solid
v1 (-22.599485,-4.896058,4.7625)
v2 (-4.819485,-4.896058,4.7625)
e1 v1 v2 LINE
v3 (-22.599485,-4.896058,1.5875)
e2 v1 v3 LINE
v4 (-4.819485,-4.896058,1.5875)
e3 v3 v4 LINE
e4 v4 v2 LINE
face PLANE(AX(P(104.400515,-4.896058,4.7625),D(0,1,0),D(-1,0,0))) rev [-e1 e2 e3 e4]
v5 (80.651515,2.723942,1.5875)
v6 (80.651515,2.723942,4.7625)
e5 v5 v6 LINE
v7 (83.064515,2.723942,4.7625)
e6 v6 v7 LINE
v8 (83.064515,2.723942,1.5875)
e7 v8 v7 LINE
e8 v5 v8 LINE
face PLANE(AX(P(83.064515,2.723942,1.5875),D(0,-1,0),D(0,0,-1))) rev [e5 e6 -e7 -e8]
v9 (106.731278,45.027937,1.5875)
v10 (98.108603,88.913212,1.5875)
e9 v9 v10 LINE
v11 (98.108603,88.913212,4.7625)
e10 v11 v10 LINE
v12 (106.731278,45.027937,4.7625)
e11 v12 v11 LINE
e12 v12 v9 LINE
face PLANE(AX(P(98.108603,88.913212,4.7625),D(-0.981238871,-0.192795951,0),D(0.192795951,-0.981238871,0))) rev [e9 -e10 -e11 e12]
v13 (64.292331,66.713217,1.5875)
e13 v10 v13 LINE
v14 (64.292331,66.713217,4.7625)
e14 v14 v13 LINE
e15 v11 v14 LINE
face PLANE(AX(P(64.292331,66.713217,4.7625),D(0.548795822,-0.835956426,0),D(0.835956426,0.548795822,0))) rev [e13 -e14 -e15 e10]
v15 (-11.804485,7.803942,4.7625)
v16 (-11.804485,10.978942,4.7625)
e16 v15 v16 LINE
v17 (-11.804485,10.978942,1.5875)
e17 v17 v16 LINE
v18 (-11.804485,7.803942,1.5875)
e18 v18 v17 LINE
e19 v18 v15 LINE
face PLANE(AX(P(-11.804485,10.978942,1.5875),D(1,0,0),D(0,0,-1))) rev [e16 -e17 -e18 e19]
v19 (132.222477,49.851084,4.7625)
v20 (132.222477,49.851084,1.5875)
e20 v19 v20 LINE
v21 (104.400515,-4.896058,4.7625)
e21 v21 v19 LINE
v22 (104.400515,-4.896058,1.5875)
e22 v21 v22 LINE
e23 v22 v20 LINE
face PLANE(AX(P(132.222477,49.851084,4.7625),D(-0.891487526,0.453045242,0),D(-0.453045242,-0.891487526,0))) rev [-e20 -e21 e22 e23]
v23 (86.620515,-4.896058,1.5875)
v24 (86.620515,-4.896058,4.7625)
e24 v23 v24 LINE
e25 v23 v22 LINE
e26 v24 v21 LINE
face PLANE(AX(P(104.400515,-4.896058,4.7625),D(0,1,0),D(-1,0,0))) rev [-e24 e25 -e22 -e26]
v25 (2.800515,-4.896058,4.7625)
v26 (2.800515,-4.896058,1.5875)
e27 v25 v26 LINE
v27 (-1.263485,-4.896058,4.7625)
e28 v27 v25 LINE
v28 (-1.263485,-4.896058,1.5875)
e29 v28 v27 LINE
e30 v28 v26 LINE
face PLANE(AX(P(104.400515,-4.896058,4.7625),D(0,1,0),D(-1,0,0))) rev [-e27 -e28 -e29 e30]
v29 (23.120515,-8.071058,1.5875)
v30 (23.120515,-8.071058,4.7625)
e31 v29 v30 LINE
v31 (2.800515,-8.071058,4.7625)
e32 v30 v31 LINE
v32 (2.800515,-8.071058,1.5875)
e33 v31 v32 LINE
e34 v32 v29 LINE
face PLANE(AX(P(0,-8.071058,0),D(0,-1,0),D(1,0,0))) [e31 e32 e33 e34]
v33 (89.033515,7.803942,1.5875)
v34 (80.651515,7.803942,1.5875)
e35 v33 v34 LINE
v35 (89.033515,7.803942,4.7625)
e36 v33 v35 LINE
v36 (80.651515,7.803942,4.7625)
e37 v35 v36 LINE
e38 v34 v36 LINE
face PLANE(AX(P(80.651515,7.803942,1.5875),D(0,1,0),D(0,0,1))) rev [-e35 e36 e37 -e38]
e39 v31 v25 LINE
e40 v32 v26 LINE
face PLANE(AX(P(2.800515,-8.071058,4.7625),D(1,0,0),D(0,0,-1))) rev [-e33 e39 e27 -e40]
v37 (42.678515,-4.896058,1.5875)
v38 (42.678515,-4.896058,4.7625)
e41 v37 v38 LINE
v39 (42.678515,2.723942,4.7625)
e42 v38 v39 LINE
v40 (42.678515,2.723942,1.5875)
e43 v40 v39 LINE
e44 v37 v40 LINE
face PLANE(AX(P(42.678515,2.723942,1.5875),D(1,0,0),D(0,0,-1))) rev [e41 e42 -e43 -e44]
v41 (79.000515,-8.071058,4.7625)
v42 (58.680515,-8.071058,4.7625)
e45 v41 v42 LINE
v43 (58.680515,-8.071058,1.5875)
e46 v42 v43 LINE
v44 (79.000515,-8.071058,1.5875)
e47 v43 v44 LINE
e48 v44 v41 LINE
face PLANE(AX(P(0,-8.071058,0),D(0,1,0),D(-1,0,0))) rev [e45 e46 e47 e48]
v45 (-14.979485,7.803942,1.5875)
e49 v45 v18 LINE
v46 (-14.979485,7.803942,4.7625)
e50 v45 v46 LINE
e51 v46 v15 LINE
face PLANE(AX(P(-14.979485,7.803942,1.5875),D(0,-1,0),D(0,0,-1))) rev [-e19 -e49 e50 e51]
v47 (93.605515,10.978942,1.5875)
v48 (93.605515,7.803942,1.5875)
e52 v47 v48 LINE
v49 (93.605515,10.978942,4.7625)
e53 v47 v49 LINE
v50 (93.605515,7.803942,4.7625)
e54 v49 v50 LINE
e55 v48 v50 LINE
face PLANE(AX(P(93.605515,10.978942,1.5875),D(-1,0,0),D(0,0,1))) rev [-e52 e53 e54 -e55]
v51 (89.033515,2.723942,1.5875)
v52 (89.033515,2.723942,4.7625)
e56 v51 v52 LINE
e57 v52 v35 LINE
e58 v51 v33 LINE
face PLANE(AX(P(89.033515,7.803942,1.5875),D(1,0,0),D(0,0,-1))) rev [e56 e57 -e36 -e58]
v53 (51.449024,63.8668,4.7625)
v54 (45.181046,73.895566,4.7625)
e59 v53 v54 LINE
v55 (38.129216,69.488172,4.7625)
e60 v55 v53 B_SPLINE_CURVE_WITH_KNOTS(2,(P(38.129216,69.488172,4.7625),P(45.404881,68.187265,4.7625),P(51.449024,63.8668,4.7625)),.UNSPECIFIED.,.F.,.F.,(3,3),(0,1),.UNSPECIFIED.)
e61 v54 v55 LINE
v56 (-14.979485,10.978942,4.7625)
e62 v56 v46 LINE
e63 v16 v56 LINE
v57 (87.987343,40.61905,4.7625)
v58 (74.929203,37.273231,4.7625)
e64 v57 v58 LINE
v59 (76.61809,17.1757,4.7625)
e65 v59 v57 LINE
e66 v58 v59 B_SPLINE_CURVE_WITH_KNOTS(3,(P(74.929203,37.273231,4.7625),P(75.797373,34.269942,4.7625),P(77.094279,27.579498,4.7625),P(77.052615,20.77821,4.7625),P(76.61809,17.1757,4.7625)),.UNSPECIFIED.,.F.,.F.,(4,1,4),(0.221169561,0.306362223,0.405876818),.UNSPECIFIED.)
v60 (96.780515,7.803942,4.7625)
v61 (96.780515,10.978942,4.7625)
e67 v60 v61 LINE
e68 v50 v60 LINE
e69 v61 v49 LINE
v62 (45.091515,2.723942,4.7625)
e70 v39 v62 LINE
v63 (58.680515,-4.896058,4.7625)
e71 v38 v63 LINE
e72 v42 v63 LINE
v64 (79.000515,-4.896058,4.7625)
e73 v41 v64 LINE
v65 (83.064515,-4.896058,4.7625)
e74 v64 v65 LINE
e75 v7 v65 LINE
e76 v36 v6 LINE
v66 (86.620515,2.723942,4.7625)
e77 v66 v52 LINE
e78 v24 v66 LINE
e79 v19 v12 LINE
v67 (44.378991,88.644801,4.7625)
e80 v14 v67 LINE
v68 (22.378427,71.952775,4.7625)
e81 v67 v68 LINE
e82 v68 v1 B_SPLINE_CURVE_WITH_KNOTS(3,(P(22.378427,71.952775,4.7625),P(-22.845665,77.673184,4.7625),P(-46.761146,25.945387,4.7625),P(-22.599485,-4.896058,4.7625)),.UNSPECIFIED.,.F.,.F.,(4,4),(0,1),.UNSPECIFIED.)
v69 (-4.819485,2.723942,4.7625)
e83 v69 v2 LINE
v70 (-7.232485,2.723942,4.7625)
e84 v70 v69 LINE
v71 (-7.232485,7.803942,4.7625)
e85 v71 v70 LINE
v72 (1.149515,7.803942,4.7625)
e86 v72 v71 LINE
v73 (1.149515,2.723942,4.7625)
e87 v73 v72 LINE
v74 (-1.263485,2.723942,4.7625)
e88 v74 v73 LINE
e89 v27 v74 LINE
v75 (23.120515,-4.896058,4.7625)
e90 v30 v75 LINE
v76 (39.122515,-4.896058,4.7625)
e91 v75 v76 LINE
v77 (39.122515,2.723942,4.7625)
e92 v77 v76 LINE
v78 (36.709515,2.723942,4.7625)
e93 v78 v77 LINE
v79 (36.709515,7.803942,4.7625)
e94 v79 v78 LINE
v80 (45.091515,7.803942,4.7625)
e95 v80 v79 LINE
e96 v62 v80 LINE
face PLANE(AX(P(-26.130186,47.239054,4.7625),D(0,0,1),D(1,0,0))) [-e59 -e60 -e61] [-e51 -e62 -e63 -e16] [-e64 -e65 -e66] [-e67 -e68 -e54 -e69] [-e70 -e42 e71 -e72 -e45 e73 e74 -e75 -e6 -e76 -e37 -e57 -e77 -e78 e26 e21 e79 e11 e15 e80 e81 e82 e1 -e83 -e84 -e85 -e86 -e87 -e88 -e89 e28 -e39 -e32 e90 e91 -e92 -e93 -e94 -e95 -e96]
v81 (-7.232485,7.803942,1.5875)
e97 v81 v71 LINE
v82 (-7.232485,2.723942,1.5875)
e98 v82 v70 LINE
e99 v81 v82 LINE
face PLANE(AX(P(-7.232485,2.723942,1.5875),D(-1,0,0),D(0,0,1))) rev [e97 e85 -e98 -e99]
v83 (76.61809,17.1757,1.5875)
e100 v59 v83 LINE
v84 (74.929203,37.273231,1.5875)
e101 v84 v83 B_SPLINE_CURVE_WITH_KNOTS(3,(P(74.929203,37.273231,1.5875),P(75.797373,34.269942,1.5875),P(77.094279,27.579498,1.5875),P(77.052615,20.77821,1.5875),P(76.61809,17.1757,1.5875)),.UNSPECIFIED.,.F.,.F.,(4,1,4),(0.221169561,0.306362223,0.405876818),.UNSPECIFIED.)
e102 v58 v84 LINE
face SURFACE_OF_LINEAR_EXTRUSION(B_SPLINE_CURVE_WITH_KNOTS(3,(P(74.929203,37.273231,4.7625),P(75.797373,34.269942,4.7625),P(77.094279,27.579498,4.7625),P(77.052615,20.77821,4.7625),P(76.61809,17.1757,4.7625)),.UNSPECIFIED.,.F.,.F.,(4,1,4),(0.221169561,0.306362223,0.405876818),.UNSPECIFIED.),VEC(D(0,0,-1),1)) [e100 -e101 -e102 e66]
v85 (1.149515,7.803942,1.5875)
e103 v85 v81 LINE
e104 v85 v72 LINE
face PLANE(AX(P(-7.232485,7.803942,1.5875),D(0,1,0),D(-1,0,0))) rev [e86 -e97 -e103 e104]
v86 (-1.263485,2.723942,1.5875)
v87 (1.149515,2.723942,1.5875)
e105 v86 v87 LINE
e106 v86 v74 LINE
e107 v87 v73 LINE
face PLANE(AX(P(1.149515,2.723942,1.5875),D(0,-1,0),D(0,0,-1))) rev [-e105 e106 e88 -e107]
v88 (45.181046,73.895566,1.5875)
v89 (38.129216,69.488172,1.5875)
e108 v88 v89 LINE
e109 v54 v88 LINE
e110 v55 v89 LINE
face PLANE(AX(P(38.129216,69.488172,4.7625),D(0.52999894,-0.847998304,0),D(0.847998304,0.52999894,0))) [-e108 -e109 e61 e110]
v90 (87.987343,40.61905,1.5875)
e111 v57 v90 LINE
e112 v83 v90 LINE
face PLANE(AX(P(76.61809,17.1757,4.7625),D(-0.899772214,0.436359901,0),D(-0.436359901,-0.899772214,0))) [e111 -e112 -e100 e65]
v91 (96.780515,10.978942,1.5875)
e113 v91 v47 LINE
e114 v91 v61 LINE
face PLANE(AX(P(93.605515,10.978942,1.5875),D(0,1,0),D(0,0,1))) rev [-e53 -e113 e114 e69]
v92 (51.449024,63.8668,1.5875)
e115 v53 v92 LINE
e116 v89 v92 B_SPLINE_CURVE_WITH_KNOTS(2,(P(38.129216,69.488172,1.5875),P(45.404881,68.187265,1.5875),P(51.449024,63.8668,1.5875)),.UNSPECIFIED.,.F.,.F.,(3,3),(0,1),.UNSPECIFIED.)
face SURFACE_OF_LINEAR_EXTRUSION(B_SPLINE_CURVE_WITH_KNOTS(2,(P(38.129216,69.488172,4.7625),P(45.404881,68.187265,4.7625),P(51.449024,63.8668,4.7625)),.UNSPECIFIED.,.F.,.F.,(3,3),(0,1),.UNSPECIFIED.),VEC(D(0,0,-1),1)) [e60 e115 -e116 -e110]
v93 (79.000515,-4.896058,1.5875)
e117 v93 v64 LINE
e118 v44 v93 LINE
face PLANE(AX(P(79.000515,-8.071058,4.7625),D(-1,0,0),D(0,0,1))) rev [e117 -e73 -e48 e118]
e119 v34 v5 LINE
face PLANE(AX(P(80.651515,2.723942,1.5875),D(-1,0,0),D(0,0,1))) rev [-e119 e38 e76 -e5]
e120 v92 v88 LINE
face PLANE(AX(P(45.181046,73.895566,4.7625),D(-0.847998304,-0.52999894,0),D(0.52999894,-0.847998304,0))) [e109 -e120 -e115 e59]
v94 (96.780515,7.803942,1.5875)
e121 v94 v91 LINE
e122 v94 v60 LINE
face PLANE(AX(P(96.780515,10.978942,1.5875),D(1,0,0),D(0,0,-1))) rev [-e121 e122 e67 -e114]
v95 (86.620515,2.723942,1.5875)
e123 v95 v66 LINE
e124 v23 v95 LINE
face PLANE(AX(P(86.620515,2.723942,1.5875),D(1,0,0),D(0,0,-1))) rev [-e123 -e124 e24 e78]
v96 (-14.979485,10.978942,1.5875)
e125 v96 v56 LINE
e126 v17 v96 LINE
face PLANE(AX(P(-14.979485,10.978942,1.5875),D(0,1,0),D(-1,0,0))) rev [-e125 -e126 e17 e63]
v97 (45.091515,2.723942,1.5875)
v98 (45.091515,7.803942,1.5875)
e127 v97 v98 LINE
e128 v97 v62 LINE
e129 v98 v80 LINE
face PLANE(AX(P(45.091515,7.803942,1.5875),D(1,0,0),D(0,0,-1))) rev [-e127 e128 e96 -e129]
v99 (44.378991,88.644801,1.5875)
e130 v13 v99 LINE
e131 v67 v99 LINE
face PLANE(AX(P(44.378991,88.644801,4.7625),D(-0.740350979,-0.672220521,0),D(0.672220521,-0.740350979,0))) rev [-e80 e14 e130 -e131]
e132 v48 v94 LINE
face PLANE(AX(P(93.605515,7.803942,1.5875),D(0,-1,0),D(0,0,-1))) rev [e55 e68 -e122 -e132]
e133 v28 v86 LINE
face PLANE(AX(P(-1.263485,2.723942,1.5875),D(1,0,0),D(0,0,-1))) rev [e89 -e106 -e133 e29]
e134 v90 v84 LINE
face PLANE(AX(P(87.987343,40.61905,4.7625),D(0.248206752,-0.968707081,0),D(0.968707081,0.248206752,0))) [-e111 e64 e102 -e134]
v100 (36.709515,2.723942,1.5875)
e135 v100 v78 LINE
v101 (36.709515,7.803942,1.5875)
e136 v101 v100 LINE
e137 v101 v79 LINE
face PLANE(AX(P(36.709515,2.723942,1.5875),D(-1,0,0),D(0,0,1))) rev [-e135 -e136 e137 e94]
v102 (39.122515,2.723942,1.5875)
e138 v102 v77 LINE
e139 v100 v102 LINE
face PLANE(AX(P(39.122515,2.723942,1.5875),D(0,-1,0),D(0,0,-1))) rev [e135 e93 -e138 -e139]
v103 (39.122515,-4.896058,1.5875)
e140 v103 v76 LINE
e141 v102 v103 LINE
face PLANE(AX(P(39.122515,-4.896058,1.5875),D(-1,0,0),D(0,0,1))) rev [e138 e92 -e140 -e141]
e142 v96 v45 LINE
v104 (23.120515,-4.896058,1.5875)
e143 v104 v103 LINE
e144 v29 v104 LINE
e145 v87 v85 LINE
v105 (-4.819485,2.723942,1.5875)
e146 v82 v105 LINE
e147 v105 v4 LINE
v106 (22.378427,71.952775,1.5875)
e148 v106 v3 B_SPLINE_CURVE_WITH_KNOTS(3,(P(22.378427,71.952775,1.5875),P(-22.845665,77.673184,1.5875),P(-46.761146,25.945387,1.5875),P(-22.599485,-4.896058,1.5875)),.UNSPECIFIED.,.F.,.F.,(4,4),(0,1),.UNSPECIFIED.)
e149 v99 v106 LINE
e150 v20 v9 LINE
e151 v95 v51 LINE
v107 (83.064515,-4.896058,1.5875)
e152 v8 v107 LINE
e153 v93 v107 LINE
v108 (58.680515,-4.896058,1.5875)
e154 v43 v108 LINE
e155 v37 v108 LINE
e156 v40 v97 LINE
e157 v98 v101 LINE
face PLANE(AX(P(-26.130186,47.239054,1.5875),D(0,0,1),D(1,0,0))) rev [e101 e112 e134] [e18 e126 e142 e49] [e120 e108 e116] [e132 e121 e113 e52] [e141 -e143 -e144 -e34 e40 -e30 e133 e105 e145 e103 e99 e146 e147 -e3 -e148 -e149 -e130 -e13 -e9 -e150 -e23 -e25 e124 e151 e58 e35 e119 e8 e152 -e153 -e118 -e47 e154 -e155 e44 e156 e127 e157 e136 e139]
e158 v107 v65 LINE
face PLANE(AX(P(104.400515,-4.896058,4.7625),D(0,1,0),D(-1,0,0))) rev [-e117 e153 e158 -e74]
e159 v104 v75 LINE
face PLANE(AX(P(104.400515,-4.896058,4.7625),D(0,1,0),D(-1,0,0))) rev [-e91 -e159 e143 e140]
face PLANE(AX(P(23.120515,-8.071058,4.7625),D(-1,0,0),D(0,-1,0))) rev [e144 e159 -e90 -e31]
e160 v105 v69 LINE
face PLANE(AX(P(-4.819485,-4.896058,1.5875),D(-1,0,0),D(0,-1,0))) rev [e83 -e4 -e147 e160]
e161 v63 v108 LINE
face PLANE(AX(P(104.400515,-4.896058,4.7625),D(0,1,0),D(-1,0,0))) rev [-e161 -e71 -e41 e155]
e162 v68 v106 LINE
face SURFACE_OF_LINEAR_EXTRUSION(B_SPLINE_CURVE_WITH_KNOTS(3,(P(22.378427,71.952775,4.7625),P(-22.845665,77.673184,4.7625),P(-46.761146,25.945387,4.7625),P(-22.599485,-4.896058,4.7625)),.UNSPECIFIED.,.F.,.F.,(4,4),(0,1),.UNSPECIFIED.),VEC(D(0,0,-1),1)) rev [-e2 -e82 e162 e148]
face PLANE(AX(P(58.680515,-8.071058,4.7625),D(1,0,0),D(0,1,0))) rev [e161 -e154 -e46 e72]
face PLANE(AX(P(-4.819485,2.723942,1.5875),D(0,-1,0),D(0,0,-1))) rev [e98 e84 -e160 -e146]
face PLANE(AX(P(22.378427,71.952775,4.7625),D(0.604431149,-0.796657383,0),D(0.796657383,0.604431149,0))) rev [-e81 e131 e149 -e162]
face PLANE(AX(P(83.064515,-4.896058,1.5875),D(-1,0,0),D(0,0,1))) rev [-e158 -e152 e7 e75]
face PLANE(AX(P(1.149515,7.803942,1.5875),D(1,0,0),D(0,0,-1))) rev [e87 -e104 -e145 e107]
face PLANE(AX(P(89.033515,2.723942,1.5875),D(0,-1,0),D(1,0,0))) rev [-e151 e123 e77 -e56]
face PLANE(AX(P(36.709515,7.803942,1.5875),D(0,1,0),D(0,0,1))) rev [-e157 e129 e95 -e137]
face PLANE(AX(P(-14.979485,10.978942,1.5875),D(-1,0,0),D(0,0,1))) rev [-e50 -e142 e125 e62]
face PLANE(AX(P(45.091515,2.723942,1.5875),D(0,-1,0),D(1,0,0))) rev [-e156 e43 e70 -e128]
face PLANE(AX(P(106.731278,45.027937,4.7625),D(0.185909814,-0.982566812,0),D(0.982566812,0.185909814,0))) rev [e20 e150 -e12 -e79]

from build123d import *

# Parameters (mm, degrees)
BOSS_EXTRUDE2_DEPTH = 6.35
SCALE1_DEPTH        = 6.35
SCALE1_2_DEPTH      = 1.587500269
SCALE1_START        = 4.762500269
SCALE1_3_DEPTH      = 1.587499731
SCALE1_START_2      = 1.587500269
SCALE1_4_DEPTH      = 3.175
SKETCH2_W           = 3.175
SKETCH2_H           = 3.175
CUT_EXTRUDE2_DEPTH  = 3.175
SKETCH3_W           = 20.32
SKETCH3_H           = 3.175
BOSS_EXTRUDE3_DEPTH = 3.175
CUT_EXTRUDE3_DEPTH  = 3.175


# Read off the part's stored shape, not the designer's step: Scale1
with BuildPart() as part:
    # Sketch1 → Boss-Extrude2 (new body)
    with BuildSketch(Plane.XY):
        with BuildLine():
            Line((83.827808052, -44.105116896), (-89.955824252, -44.105116896))
            add(Edge.make_bspline(
                [(-89.955824252, -44.105116896), (-138.279146298, 17.577773588), (-90.448185334, 121.033367978), (0, 109.592549188)],
                knots=[0, 0, 0, 0, 1, 1, 1, 1], degree=3))
            Line((0, 109.592549188), (44.001127073, 142.976601592))
            Line((44.001127073, 142.976601592), (83.827808052, 99.113432677))
            Line((83.827808052, 99.113432677), (151.46035168, 143.51342315))
            Line((151.46035168, 143.51342315), (168.705700605, 55.742873106))
            Line((168.705700605, 55.742873106), (219.688100022, 65.389167163))
            Line((219.688100022, 65.389167163), (164.044175748, -44.105116896))
            Line((164.044175748, -44.105116896), (83.827808052, -44.105116896))
        make_face()
        with BuildLine():
            Line((108.479325939, 0.038399309), (131.217832103, 46.925099923))
            Line((131.217832103, 46.925099923), (105.101551368, 40.233461811))
            add(Edge.make_bspline(
                [(108.479325939, 0.038399309), (109.348375822, 7.243418902), (109.431703621, 20.845994783), (106.837891987, 34.226883905), (105.101551368, 40.233461811)],
                knots=[0.221169561, 0.221169561, 0.221169561, 0.221169561, 0.320684156, 0.405876818, 0.405876818, 0.405876818, 0.405876818], degree=3))
        make_face(mode=Mode.SUBTRACT)
        with BuildLine():
            Line((31.501577026, 104.663344036), (45.60523641, 113.478131151))
            Line((45.60523641, 113.478131151), (58.141193688, 93.420599506))
            add(Edge.make_bspline(
                [(58.141193688, 93.420599506), (46.052907541, 102.061530026), (31.501577026, 104.663344036)],
                knots=[0, 0, 0, 1, 1, 1], degree=2))
        make_face(mode=Mode.SUBTRACT)
    extrude(amount=BOSS_EXTRUDE2_DEPTH)

    # Scale1 outline → Scale1 (cut)
    # profile 1 of 3: a face of its own
    with BuildSketch(Plane.XY):
        with BuildLine():
            Line((44.001127073, 142.976601592), (0, 109.592549188))
            add(Edge.make_bspline(
                [(0, 109.592549188), (-90.448185334, 121.033367978), (-138.279146298, 17.577773588), (-89.955824252, -44.105116896)],
                knots=[0, 0, 0, 0, 1, 1, 1, 1], degree=3))
            Line((-89.955824252, -44.105116896), (164.044175748, -44.105116896))
            Line((164.044175748, -44.105116896), (219.688100022, 65.389167163))
            Line((219.688100022, 65.389167163), (168.705700605, 55.742873106))
            Line((168.705700605, 55.742873106), (151.46035168, 143.51342315))
            Line((151.46035168, 143.51342315), (83.827808052, 99.113432677))
            Line((83.827808052, 99.113432677), (44.001127073, 142.976601592))
        make_face()
        with BuildLine():
            add(Edge.make_bspline(
                [(22.378427384, 71.952774895), (-22.845665283, 77.67318429), (-46.761145765, 25.945387095), (-22.599484742, -4.896058147)],
                knots=[0, 0, 0, 0, 1, 1, 1, 1], degree=3))
            Line((22.378427384, 71.952774895), (44.378990921, 88.644801097))
            Line((44.378990921, 88.644801097), (64.29233141, 66.713216639))
            Line((64.29233141, 66.713216639), (98.108603224, 88.913211876))
            Line((98.108603224, 88.913211876), (106.731277687, 45.027936854))
            Line((106.731277687, 45.027936854), (132.222477396, 49.851083882))
            Line((132.222477396, 49.851083882), (130.663317047, 46.783019429))
            Line((130.663317047, 46.783019429), (131.217832103, 46.925099923))
            Line((131.217832103, 46.925099923), (108.479325939, 0.038399309))
            add(Edge.make_bspline(
                [(108.864671926, 3.888362517), (108.762049288, 2.601843236), (108.633688525, 1.318171025), (108.479325939, 0.038399309)],
                knots=[0.388200813, 0.388200813, 0.388200813, 0.388200813, 0.405876818, 0.405876818, 0.405876818, 0.405876818], degree=3))
            Line((108.864671926, 3.888362517), (104.400515258, -4.896058147))
            Line((104.400515258, -4.896058147), (-22.599484742, -4.896058147))
        make_face(mode=Mode.SUBTRACT)
        with BuildLine():
            add(Edge.make_bspline(
                [(31.501577026, 104.663344036), (46.052907541, 102.061530026), (58.141193688, 93.420599506)],
                knots=[0, 0, 0, 1, 1, 1], degree=2))
            Line((31.501577026, 104.663344036), (45.60523641, 113.478131151))
            Line((45.60523641, 113.478131151), (58.141193688, 93.420599506))
        make_face(mode=Mode.SUBTRACT)
    # profile 2 of 3: a face of its own
    with BuildSketch(Plane.XY):
        with BuildLine():
            Line((45.18104559, 73.895565876), (38.129215897, 69.488172319))
            add(Edge.make_bspline(
                [(38.129215897, 69.488172319), (45.404881155, 68.187265314), (51.449024229, 63.866800054)],
                knots=[0, 0, 0, 1, 1, 1], degree=2))
            Line((51.449024229, 63.866800054), (45.18104559, 73.895565876))
        make_face()
    # profile 3 of 3: a face of its own
    with BuildSketch(Plane.XY):
        with BuildLine():
            Line((87.987343436, 40.619050262), (74.929203069, 37.273231206))
            add(Edge.make_bspline(
                [(74.929203069, 37.273231206), (75.797373378, 34.269942253), (77.094279195, 27.579497692), (77.052615295, 20.778209752), (76.618090354, 17.175699955)],
                knots=[0.221169561, 0.221169561, 0.221169561, 0.221169561, 0.306362223, 0.405876818, 0.405876818, 0.405876818, 0.405876818], degree=3))
            Line((76.618090354, 17.175699955), (87.987343436, 40.619050262))
        make_face()
    extrude(amount=SCALE1_DEPTH, mode=Mode.SUBTRACT)

    # Scale1 2 outline → Scale1 2 (cut)
    with BuildSketch(Plane.XY):
        with BuildLine():
            Line((44.378990921, 88.644801097), (22.378427384, 71.952774895))
            add(Edge.make_bspline(
                [(22.378427384, 71.952774895), (-22.845665283, 77.67318429), (-46.761145765, 25.945387095), (-22.599484742, -4.896058147)],
                knots=[0, 0, 0, 0, 1, 1, 1, 1], degree=3))
            Line((-22.599484742, -4.896058147), (104.400515258, -4.896058147))
            Line((104.400515258, -4.896058147), (108.864671926, 3.888362517))
            add(Edge.make_bspline(
                [(105.101551368, 40.233461811), (106.837891987, 34.226883905), (109.183482579, 22.126511148), (109.339807105, 9.844851123), (108.864671926, 3.888362517)],
                knots=[0.221169561, 0.221169561, 0.221169561, 0.221169561, 0.306362223, 0.388200813, 0.388200813, 0.388200813, 0.388200813], degree=3))
            Line((105.101551368, 40.233461811), (130.663317047, 46.783019429))
            Line((130.663317047, 46.783019429), (132.222477396, 49.851083882))
            Line((132.222477396, 49.851083882), (106.731277687, 45.027936854))
            Line((106.731277687, 45.027936854), (98.108603224, 88.913211876))
            Line((98.108603224, 88.913211876), (64.29233141, 66.713216639))
            Line((64.29233141, 66.713216639), (44.378990921, 88.644801097))
        make_face()
        with BuildLine():
            add(Edge.make_bspline(
                [(74.929203069, 37.273231206), (75.797373378, 34.269942253), (77.094279195, 27.579497692), (77.052615295, 20.778209752), (76.618090354, 17.175699955)],
                knots=[0.221169561, 0.221169561, 0.221169561, 0.221169561, 0.306362223, 0.405876818, 0.405876818, 0.405876818, 0.405876818], degree=3))
            Line((74.929203069, 37.273231206), (87.987343436, 40.619050262))
            Line((87.987343436, 40.619050262), (76.618090354, 17.175699955))
        make_face(mode=Mode.SUBTRACT)
        with BuildLine():
            add(Edge.make_bspline(
                [(38.129215897, 69.488172319), (45.404881155, 68.187265314), (51.449024229, 63.866800054)],
                knots=[0, 0, 0, 1, 1, 1], degree=2))
            Line((38.129215897, 69.488172319), (45.18104559, 73.895565876))
            Line((45.18104559, 73.895565876), (51.449024229, 63.866800054))
        make_face(mode=Mode.SUBTRACT)
    extrude(amount=SCALE1_2_DEPTH, mode=Mode.SUBTRACT)

    # Scale1 3 outline → Scale1 3 (cut)
    with BuildSketch(Plane.XY.offset(SCALE1_START)):
        with BuildLine():
            Line((44.378990921, 88.644801097), (22.378427384, 71.952774895))
            add(Edge.make_bspline(
                [(22.378427384, 71.952774895), (-22.845665283, 77.67318429), (-46.761145765, 25.945387095), (-22.599484742, -4.896058147)],
                knots=[0, 0, 0, 0, 1, 1, 1, 1], degree=3))
            Line((-22.599484742, -4.896058147), (104.400515258, -4.896058147))
            Line((104.400515258, -4.896058147), (108.864671926, 3.888362517))
            add(Edge.make_bspline(
                [(105.101551368, 40.233461811), (106.837891987, 34.226883905), (109.183482579, 22.126511148), (109.339807105, 9.844851123), (108.864671926, 3.888362517)],
                knots=[0.221169561, 0.221169561, 0.221169561, 0.221169561, 0.306362223, 0.388200813, 0.388200813, 0.388200813, 0.388200813], degree=3))
            Line((105.101551368, 40.233461811), (130.663317047, 46.783019429))
            Line((130.663317047, 46.783019429), (132.222477396, 49.851083882))
            Line((132.222477396, 49.851083882), (106.731277687, 45.027936854))
            Line((106.731277687, 45.027936854), (98.108603224, 88.913211876))
            Line((98.108603224, 88.913211876), (64.29233141, 66.713216639))
            Line((64.29233141, 66.713216639), (44.378990921, 88.644801097))
        make_face()
        with BuildLine():
            add(Edge.make_bspline(
                [(74.929203069, 37.273231206), (75.797373378, 34.269942253), (77.094279195, 27.579497692), (77.052615295, 20.778209752), (76.618090354, 17.175699955)],
                knots=[0.221169561, 0.221169561, 0.221169561, 0.221169561, 0.306362223, 0.405876818, 0.405876818, 0.405876818, 0.405876818], degree=3))
            Line((74.929203069, 37.273231206), (87.987343436, 40.619050262))
            Line((87.987343436, 40.619050262), (76.618090354, 17.175699955))
        make_face(mode=Mode.SUBTRACT)
        with BuildLine():
            add(Edge.make_bspline(
                [(38.129215897, 69.488172319), (45.404881155, 68.187265314), (51.449024229, 63.866800054)],
                knots=[0, 0, 0, 1, 1, 1], degree=2))
            Line((38.129215897, 69.488172319), (45.18104559, 73.895565876))
            Line((45.18104559, 73.895565876), (51.449024229, 63.866800054))
        make_face(mode=Mode.SUBTRACT)
    extrude(amount=SCALE1_3_DEPTH, mode=Mode.SUBTRACT)

    # Scale1 4 outline → Scale1 4 (add)
    with BuildSketch(Plane.XY.offset(SCALE1_START_2)):
        with BuildLine():
            add(Edge.make_bspline(
                [(105.101551368, 40.233461811), (106.837891987, 34.226883905), (109.183482579, 22.126511148), (109.339807105, 9.844851123), (108.864671926, 3.888362517)],
                knots=[0.221169561, 0.221169561, 0.221169561, 0.221169561, 0.306362223, 0.388200813, 0.388200813, 0.388200813, 0.388200813], degree=3))
            Line((108.864671926, 3.888362517), (130.663317047, 46.783019429))
            Line((130.663317047, 46.783019429), (105.101551368, 40.233461811))
        make_face()
    extrude(amount=SCALE1_4_DEPTH)

    # Sketch2 → Cut-Extrude2 (cut)
    with BuildSketch(Plane.XY.offset(4.762500269)):
        with Locations((-13.391984742, 9.391441853)):
            Rectangle(SKETCH2_W, SKETCH2_H)
        with Locations((95.193015258, 9.391441853)):
            Rectangle(SKETCH2_W, SKETCH2_H)
    extrude(amount=-CUT_EXTRUDE2_DEPTH, mode=Mode.SUBTRACT)

    # Sketch3 → Boss-Extrude3 (add)
    with BuildSketch(Plane.XZ.offset(4.896058147)):
        with Locations((12.960515258, 3.175000269)):
            Rectangle(SKETCH3_W, SKETCH3_H)
        with Locations((68.840515258, 3.175000269)):
            Rectangle(SKETCH3_W, SKETCH3_H)
    extrude(amount=BOSS_EXTRUDE3_DEPTH)

    # Sketch4 → Cut-Extrude3 (cut)
    with BuildSketch(Plane.XY.offset(4.762500269)):
        Polygon((-7.232484742, 7.803941853), (1.149515258, 7.803941853), (1.149515258, 2.723941853), (-1.263484742, 2.723941853), (-1.263484742, -4.896058147), (-4.819484742, -4.896058147), (-4.819484742, 2.723941853), (-7.232484742, 2.723941853), align=None)
        Polygon((36.709515258, 7.803941853), (45.091515258, 7.803941853), (45.091515258, 2.723941853), (42.678515258, 2.723941853), (42.678515258, -4.896058147), (39.122515258, -4.896058147), (39.122515258, 2.723941853), (36.709515258, 2.723941853), align=None)
        Polygon((80.651515258, 7.803941853), (89.033515258, 7.803941853), (89.033515258, 2.723941853), (86.620515258, 2.723941853), (86.620515258, -4.896058147), (83.064515258, -4.896058147), (83.064515258, 2.723941853), (80.651515258, 2.723941853), align=None)
    extrude(amount=-CUT_EXTRUDE3_DEPTH, mode=Mode.SUBTRACT)


solid = part.part
